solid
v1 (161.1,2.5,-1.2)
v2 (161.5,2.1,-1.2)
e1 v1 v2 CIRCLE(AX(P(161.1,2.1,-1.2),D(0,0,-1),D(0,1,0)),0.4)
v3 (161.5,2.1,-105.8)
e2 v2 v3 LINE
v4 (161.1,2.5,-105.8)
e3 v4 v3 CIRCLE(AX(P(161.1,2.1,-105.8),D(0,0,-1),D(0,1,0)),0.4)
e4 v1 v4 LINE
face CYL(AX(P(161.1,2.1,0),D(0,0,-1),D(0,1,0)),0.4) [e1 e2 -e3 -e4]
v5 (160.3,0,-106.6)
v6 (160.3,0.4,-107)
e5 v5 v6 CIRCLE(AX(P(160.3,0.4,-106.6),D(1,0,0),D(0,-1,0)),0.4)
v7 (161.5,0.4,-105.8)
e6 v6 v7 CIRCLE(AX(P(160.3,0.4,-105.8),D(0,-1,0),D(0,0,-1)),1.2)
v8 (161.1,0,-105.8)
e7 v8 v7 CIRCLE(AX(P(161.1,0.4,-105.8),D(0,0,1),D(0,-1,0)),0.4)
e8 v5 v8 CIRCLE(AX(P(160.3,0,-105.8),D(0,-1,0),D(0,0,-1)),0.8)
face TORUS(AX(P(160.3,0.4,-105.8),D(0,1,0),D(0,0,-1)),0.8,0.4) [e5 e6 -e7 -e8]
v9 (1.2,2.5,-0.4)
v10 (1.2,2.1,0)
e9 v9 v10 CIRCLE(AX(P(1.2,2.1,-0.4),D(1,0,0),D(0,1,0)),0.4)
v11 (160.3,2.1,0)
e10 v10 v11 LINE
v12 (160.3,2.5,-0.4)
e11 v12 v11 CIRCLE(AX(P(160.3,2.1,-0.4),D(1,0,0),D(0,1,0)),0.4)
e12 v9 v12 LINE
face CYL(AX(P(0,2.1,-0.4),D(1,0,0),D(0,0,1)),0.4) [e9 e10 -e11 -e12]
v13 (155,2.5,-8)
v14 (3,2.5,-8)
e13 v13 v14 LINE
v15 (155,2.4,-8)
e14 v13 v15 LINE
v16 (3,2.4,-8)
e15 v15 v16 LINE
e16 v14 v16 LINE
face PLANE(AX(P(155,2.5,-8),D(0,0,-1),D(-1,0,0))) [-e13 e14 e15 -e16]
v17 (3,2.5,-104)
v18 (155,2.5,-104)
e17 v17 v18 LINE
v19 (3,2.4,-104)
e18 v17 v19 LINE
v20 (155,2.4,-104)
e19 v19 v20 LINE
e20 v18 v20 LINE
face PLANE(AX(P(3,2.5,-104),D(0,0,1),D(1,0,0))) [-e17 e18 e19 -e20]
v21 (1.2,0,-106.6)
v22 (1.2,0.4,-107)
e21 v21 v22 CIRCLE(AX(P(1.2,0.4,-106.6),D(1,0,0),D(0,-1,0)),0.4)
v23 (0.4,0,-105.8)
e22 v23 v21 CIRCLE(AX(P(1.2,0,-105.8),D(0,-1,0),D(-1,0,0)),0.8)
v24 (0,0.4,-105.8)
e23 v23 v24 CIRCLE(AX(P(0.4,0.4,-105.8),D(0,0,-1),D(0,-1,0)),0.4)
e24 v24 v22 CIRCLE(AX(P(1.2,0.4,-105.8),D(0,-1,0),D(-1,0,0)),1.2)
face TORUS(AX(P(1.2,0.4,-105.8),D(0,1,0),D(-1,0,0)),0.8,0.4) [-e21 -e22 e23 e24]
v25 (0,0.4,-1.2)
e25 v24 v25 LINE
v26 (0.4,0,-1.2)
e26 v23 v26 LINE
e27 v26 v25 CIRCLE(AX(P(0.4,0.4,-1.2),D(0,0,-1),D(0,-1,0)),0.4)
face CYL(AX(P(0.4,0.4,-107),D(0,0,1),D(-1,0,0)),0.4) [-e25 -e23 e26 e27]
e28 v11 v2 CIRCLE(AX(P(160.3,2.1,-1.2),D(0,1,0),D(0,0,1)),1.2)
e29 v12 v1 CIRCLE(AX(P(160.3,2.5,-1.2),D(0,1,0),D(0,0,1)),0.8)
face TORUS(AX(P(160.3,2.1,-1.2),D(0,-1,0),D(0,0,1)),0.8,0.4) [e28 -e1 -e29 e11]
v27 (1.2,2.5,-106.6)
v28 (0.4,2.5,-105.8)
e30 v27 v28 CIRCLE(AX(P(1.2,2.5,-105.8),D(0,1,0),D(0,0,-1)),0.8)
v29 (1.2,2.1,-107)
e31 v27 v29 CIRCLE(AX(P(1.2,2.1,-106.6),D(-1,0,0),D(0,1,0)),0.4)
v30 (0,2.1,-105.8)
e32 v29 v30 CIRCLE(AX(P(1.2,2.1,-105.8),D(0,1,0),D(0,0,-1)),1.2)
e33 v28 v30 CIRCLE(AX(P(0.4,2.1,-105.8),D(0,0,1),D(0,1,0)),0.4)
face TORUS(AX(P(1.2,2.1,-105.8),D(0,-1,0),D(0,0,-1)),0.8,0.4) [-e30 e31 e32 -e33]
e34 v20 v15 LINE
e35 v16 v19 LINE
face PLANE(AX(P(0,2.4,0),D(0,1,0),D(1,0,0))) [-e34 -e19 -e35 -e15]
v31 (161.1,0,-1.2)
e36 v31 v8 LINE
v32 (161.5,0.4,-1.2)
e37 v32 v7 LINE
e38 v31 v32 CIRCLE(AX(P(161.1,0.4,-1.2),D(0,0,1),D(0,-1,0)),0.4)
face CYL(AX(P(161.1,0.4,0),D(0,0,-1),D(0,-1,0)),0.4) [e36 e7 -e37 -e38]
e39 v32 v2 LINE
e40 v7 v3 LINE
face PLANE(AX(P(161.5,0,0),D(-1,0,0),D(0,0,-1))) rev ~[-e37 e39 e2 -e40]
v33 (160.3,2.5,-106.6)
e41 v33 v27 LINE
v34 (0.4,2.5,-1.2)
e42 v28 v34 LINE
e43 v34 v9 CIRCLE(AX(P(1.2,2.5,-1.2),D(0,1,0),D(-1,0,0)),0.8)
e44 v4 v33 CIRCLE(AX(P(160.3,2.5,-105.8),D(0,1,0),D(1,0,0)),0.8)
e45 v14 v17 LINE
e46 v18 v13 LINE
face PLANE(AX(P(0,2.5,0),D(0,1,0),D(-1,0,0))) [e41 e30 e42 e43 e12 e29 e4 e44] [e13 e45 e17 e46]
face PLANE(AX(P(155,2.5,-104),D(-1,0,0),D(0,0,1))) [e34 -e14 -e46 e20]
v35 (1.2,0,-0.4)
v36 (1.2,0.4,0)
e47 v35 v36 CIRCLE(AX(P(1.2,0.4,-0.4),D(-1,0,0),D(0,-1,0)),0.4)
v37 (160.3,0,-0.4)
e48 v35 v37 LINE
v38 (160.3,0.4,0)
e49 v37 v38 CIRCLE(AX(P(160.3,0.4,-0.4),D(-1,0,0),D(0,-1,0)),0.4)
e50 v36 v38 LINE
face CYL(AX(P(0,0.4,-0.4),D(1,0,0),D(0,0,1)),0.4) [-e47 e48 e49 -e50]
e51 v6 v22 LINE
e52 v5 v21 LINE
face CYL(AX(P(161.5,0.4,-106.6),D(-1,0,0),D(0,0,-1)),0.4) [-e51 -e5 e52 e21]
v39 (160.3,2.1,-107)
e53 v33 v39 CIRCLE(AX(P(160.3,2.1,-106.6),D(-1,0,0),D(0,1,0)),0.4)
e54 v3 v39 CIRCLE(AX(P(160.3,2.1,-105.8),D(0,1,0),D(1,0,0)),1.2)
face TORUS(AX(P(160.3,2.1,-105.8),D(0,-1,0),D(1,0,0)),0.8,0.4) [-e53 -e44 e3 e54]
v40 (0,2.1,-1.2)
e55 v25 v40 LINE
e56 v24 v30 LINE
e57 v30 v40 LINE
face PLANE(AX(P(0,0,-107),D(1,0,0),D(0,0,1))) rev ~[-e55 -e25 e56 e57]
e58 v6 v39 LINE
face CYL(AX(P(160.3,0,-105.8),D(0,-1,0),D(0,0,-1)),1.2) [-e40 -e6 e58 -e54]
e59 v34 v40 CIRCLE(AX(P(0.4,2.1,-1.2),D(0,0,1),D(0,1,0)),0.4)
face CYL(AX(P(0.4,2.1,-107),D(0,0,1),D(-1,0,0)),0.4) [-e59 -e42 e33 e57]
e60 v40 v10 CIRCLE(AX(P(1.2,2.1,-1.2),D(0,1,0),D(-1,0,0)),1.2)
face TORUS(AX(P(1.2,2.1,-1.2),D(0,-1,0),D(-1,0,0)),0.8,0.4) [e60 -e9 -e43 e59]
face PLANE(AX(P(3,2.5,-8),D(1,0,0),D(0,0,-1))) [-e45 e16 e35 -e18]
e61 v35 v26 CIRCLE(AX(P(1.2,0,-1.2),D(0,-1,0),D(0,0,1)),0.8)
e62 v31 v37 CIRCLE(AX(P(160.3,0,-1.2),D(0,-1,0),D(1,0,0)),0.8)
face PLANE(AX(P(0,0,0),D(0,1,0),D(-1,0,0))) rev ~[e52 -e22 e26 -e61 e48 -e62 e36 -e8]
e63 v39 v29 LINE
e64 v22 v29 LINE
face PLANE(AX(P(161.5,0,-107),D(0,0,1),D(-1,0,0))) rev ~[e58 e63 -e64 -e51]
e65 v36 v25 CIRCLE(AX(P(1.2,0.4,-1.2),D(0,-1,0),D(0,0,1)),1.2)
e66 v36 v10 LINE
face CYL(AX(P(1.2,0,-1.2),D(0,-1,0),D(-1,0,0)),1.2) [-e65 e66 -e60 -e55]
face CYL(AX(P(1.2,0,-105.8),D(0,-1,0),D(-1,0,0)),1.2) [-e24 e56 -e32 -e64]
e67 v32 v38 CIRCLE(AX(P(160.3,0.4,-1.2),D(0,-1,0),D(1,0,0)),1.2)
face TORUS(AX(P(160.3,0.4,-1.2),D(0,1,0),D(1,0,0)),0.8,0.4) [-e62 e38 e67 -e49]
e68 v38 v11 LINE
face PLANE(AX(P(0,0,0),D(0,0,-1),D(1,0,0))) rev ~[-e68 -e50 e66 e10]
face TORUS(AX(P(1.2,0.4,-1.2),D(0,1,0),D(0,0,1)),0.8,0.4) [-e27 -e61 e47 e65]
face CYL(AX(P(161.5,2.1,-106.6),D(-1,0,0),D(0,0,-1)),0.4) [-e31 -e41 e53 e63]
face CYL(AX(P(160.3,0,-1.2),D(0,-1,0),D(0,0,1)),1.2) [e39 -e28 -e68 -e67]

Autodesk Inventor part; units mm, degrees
ref_plane "YZ Plane" through (0, 0, 0) normal (1, 0, 0) x (0, 1, 0)
ref_plane "XZ Plane" through (0, 0, 0) normal (0, 1, 0) x (-1, 0, 0)
ref_plane "XY Plane" through (0, 0, 0) normal (0, 0, 1) x (1, 0, 0)
sketch "Sketch1" plane through (0, 0, 0) normal (0, 1, 0) x (-1, 0, 0)
  line L0 (0, 0) -> (-161.5, 0)
  line L1 (-161.5, 0) -> (-161.5, -107)
  line L2 (-161.5, -107) -> (0, -107)
  line L3 (0, -107) -> (0, 0)
  dimension "d0" = 161.5
  dimension "d1" = 107
extrude "Extrusion1" add sketch "Sketch1" along normal blind 2.5
sketch "Sketch2" plane through (0, 2.5, 0) normal (0, 1, 0) x (1, 0, 0)
  line L0 (161.5, 107) -> (0, 107) projected
  line L1 (0, 107) -> (0, 0) projected
  line L2 (3, 104) -> (155, 104)
  line L3 (155, 104) -> (155, 8)
  line L4 (155, 8) -> (3, 8)
  line L5 (3, 8) -> (3, 104)
  dimension "d4" = 3
  dimension "d5" = 3
  dimension "d6" = 152
  dimension "d7" = 96
extrude "Extrusion2" cut sketch "Sketch2" against normal blind 0.1
fillet "Fillet1" radius 0.4 8 edges at (0, 2.5, -53.5) (80.75, 2.5, -107) (80.75, 2.5, 0) (161.5, 2.5, -53.5) (80.75, 0, 0) (0, 0, -53.5) (80.75, 0, -107) (161.5, 0, -53.5)
fillet "Fillet2" radius 1.2 12 edges at (161.3828, 2.3828, -0.1172) (161.3828, 0.1172, -0.1172) (161.5, 1.25, 0) (0.1172, 2.3828, -0.1172) (0.1172, 0.1172, -0.1172) (0, 1.25, 0) (0.1172, 2.3828, -106.8828) (0.1172, 0.1172, -106.8828) (0, 1.25, -107) (161.3828, 2.3828, -106.8828) (161.3828, 0.1172, -106.8828) (161.5, 1.25, -107)
properties part number "main_lcd_panel"
